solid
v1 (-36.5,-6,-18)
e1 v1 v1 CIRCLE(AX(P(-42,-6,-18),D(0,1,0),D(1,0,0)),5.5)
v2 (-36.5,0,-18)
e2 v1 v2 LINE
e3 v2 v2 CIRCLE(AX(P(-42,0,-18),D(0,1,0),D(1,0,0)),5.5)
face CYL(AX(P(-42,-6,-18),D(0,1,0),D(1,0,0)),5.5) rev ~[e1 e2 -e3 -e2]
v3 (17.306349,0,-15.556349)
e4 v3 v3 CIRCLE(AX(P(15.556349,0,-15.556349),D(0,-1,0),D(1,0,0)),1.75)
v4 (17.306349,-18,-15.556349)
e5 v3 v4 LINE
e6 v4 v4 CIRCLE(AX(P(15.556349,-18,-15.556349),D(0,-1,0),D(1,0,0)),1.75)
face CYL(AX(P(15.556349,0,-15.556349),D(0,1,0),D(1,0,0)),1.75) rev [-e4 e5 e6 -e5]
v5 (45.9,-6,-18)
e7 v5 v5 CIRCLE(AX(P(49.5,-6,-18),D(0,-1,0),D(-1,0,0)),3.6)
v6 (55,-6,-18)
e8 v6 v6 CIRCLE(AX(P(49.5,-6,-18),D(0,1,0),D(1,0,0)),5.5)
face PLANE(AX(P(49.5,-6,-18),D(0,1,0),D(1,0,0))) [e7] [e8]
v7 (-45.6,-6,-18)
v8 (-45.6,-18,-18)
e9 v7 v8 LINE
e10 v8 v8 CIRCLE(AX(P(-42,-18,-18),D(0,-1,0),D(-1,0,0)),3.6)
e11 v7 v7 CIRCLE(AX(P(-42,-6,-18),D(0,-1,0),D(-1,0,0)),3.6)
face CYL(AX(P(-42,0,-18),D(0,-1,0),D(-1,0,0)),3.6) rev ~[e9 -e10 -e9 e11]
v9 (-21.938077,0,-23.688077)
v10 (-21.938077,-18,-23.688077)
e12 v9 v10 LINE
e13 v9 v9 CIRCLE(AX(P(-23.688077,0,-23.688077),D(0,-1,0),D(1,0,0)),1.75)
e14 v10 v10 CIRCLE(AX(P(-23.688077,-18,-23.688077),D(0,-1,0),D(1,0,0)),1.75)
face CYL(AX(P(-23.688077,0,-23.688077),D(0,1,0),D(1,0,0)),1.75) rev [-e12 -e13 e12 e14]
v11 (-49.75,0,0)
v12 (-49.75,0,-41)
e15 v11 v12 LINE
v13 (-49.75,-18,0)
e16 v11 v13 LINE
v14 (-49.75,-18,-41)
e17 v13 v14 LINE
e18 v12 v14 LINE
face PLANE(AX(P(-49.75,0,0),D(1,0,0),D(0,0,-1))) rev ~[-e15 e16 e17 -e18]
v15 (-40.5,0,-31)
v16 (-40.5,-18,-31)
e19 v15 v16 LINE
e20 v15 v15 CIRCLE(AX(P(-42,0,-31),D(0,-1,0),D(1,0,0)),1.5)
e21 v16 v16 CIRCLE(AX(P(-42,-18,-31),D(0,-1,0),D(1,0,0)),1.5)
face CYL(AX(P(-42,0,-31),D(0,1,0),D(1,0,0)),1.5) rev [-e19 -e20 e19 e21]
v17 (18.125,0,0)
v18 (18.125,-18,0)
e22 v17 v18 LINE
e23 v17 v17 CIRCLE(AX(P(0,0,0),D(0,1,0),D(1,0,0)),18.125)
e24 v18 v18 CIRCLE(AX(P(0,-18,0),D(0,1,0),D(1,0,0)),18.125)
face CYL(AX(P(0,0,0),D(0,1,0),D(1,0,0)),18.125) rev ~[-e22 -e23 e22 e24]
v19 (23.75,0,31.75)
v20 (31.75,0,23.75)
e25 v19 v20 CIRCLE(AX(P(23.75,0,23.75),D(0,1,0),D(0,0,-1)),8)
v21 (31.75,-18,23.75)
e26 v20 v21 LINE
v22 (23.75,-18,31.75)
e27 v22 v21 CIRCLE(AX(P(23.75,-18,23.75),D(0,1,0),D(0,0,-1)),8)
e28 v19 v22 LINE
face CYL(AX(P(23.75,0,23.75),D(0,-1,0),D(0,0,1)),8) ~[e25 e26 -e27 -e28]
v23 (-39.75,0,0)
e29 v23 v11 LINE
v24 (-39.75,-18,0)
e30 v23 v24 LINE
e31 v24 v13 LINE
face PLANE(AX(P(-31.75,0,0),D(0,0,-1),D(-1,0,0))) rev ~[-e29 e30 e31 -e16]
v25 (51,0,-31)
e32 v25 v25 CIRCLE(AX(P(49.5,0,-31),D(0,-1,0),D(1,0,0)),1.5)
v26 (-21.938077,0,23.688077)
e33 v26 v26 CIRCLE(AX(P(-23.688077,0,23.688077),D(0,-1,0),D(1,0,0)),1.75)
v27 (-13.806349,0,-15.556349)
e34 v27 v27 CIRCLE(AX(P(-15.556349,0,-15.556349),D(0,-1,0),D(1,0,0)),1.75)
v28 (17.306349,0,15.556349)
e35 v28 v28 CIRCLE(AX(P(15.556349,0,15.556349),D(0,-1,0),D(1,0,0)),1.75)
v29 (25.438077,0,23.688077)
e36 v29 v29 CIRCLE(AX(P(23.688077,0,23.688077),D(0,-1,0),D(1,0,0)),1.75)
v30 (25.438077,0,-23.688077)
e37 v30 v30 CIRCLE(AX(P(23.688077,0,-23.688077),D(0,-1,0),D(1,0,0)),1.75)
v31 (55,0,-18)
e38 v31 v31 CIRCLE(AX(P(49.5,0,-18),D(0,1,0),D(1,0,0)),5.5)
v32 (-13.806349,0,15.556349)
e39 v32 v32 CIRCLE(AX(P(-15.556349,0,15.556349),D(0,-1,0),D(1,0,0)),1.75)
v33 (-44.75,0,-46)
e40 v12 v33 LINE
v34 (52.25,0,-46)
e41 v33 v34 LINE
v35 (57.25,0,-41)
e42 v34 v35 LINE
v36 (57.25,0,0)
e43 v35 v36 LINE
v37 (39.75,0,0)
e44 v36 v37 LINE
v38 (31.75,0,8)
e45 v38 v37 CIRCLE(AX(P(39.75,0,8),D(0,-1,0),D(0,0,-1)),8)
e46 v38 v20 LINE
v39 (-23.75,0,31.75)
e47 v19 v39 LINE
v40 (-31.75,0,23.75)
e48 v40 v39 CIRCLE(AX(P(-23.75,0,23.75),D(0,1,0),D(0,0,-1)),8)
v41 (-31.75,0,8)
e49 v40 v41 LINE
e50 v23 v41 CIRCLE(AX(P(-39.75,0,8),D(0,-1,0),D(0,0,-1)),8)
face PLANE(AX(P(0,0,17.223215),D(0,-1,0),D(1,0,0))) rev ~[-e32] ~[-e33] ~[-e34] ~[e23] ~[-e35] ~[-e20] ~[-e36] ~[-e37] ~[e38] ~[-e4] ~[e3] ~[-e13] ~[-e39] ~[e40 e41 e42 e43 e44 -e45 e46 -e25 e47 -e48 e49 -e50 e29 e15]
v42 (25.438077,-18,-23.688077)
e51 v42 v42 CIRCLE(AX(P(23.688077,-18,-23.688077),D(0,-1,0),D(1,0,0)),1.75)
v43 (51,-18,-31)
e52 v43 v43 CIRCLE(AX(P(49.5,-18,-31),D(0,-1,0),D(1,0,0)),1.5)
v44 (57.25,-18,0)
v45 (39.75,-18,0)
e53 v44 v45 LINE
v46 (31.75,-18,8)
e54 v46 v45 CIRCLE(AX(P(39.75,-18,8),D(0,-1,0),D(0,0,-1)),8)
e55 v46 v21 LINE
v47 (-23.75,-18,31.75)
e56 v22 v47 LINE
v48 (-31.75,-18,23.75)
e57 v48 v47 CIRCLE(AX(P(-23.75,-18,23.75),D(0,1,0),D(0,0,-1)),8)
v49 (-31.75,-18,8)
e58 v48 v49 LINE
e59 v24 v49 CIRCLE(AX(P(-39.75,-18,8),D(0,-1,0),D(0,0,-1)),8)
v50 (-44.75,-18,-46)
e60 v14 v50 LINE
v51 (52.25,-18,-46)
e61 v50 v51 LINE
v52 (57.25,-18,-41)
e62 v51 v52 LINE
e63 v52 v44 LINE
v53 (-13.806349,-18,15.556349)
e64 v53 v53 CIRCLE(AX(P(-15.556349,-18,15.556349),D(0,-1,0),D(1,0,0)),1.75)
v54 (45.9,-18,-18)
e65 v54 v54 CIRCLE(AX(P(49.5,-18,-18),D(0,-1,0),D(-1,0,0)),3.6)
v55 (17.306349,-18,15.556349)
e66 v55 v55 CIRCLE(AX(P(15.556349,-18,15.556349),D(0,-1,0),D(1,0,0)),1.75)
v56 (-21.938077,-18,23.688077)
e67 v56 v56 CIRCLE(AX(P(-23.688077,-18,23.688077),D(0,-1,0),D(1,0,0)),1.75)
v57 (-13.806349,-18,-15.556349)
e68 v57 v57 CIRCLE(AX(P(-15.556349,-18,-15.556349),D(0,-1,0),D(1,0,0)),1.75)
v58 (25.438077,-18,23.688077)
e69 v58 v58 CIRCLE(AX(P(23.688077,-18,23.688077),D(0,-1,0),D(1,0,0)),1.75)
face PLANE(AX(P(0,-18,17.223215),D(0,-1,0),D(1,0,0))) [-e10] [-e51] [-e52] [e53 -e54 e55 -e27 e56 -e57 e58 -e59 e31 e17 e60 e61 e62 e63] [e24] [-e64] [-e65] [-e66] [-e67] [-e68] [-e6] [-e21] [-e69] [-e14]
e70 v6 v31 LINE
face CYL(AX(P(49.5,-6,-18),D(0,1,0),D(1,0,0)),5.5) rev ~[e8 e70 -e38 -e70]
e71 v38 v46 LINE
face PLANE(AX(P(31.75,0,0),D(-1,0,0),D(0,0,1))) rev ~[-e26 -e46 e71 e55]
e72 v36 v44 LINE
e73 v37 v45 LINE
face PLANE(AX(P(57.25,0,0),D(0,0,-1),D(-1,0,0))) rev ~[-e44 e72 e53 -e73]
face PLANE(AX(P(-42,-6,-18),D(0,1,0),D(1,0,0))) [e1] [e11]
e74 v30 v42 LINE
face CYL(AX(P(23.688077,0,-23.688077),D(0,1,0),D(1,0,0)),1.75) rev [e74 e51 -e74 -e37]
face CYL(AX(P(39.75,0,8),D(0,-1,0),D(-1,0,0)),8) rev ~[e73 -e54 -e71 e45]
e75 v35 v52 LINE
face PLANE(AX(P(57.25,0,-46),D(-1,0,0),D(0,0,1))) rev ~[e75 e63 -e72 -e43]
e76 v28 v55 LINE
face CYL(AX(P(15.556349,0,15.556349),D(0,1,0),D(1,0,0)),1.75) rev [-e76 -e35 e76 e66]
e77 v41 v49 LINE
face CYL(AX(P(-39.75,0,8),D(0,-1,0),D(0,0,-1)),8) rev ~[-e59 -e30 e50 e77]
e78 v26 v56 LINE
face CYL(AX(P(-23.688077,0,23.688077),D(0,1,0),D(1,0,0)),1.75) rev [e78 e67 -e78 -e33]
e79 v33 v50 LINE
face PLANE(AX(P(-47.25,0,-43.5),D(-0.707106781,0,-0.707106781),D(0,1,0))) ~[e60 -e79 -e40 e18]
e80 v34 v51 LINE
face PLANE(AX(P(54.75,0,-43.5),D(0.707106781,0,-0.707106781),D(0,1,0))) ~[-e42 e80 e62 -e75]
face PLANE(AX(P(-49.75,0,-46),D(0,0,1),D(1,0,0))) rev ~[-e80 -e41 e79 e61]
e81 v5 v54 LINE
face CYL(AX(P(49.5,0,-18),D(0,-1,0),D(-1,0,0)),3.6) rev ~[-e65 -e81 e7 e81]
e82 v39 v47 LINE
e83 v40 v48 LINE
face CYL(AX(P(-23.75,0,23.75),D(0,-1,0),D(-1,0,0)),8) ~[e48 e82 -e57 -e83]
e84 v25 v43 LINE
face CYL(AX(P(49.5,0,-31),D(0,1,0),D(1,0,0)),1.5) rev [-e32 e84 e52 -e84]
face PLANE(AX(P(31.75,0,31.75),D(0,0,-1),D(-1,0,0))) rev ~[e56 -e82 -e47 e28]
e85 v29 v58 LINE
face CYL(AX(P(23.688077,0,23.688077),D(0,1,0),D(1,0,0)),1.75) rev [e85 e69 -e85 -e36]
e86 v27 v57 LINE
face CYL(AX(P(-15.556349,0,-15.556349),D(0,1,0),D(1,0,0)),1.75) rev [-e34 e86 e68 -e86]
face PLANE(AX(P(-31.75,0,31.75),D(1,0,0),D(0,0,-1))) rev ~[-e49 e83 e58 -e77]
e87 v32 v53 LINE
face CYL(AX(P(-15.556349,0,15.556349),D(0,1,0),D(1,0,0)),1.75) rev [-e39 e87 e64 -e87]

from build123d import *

# Parameters (mm, degrees)
F0_R           = 1.75
F0_R_2         = 1.5
F1_DEPTH       = 18
F2_SIZE        = 5
F3_R           = 8
F4_D           = 7.2
F4_DEPTH       = 35
F4_CBORE_D     = 11
F4_CBORE_DEPTH = 6
F4_TIP         = 2.1630982285


# Not quite as in the source:
# - a feature names something its author has since deleted; it is built from what else it names


with BuildPart() as f1:
    # F0 (on Front) → F1 (new body)
    with BuildSketch(Plane.XZ):
        with BuildLine():
            ThreePointArc((-18.125, 0), (0, 18.125), (18.125, 0))
            Line((18.125, 0), (31.75, 0))
            Line((31.75, 0), (31.75, 31.75))
            Line((31.75, 31.75), (-31.75, 31.75))
            Line((-31.75, 31.75), (-31.75, 0))
            Line((-31.75, 0), (-18.125, 0))
        make_face()
        with Locations((-23.6880771697, 23.6880771697)):
            Circle(F0_R, mode=Mode.SUBTRACT)
        with Locations((-15.5563491861, 15.5563491861)):
            Circle(F0_R, mode=Mode.SUBTRACT)
        with Locations((15.5563491861, 15.5563491861)):
            Circle(F0_R, mode=Mode.SUBTRACT)
        with Locations((23.6880771697, 23.6880771697)):
            Circle(F0_R, mode=Mode.SUBTRACT)
        with BuildLine():
            Line((31.75, 0), (18.125, 0))
            ThreePointArc((18.125, 0), (0, -18.125), (-18.125, 0))
            Line((-18.125, 0), (-31.75, 0))
            Line((-31.75, 0), (-31.75, -31.75))
            Line((-31.75, -31.75), (31.75, -31.75))
            Line((31.75, -31.75), (31.75, 0))
        make_face()
        with Locations((-23.6880771697, -23.6880771697)):
            Circle(F0_R, mode=Mode.SUBTRACT)
        with Locations((-15.5563491861, -15.5563491861)):
            Circle(F0_R, mode=Mode.SUBTRACT)
        with Locations((23.6880771697, -23.6880771697)):
            Circle(F0_R, mode=Mode.SUBTRACT)
        with Locations((15.5563491861, -15.5563491861)):
            Circle(F0_R, mode=Mode.SUBTRACT)
        Polygon((57.25, 0), (31.75, 0), (31.75, -31.75), (-31.75, -31.75), (-31.75, 0), (-49.75, 0), (-49.75, -46), (57.25, -46), align=None)
        with Locations((-42, -31)):
            Circle(F0_R_2, mode=Mode.SUBTRACT)
        with Locations((49.5, -31)):
            Circle(F0_R_2, mode=Mode.SUBTRACT)
    extrude(amount=F1_DEPTH)

    # F2
    f2_edges = [f1.edges().sort_by_distance(p)[0] for p in [
        (-49.75, -9, -46),
        (57.25, -9, -46),
    ]]
    chamfer(f2_edges, length=F2_SIZE)

    # F3
    f3_edges = [f1.edges().sort_by_distance(p)[0] for p in [
        (-31.75, -9, 0),
        (-31.75, -9, 31.75),
        (31.75, -9, 31.75),
        (31.75, -9, 0),
    ]]
    fillet(f3_edges, radius=F3_R)

    # F4
    with Locations(Plane(origin=(0, 0, 0), x_dir=(1, 0, 0), z_dir=(0, 1, 0))):
        with Locations((49.5, 18), (-42, 18)):
            CounterBoreHole(F4_D / 2, F4_CBORE_D / 2, F4_CBORE_DEPTH, depth=F4_DEPTH)
            with Locations((0, 0, -(F4_DEPTH + F4_TIP / 2))):  # 118° drill point
                Cone(0, F4_D / 2, F4_TIP, mode=Mode.SUBTRACT)


solid = f1.part
